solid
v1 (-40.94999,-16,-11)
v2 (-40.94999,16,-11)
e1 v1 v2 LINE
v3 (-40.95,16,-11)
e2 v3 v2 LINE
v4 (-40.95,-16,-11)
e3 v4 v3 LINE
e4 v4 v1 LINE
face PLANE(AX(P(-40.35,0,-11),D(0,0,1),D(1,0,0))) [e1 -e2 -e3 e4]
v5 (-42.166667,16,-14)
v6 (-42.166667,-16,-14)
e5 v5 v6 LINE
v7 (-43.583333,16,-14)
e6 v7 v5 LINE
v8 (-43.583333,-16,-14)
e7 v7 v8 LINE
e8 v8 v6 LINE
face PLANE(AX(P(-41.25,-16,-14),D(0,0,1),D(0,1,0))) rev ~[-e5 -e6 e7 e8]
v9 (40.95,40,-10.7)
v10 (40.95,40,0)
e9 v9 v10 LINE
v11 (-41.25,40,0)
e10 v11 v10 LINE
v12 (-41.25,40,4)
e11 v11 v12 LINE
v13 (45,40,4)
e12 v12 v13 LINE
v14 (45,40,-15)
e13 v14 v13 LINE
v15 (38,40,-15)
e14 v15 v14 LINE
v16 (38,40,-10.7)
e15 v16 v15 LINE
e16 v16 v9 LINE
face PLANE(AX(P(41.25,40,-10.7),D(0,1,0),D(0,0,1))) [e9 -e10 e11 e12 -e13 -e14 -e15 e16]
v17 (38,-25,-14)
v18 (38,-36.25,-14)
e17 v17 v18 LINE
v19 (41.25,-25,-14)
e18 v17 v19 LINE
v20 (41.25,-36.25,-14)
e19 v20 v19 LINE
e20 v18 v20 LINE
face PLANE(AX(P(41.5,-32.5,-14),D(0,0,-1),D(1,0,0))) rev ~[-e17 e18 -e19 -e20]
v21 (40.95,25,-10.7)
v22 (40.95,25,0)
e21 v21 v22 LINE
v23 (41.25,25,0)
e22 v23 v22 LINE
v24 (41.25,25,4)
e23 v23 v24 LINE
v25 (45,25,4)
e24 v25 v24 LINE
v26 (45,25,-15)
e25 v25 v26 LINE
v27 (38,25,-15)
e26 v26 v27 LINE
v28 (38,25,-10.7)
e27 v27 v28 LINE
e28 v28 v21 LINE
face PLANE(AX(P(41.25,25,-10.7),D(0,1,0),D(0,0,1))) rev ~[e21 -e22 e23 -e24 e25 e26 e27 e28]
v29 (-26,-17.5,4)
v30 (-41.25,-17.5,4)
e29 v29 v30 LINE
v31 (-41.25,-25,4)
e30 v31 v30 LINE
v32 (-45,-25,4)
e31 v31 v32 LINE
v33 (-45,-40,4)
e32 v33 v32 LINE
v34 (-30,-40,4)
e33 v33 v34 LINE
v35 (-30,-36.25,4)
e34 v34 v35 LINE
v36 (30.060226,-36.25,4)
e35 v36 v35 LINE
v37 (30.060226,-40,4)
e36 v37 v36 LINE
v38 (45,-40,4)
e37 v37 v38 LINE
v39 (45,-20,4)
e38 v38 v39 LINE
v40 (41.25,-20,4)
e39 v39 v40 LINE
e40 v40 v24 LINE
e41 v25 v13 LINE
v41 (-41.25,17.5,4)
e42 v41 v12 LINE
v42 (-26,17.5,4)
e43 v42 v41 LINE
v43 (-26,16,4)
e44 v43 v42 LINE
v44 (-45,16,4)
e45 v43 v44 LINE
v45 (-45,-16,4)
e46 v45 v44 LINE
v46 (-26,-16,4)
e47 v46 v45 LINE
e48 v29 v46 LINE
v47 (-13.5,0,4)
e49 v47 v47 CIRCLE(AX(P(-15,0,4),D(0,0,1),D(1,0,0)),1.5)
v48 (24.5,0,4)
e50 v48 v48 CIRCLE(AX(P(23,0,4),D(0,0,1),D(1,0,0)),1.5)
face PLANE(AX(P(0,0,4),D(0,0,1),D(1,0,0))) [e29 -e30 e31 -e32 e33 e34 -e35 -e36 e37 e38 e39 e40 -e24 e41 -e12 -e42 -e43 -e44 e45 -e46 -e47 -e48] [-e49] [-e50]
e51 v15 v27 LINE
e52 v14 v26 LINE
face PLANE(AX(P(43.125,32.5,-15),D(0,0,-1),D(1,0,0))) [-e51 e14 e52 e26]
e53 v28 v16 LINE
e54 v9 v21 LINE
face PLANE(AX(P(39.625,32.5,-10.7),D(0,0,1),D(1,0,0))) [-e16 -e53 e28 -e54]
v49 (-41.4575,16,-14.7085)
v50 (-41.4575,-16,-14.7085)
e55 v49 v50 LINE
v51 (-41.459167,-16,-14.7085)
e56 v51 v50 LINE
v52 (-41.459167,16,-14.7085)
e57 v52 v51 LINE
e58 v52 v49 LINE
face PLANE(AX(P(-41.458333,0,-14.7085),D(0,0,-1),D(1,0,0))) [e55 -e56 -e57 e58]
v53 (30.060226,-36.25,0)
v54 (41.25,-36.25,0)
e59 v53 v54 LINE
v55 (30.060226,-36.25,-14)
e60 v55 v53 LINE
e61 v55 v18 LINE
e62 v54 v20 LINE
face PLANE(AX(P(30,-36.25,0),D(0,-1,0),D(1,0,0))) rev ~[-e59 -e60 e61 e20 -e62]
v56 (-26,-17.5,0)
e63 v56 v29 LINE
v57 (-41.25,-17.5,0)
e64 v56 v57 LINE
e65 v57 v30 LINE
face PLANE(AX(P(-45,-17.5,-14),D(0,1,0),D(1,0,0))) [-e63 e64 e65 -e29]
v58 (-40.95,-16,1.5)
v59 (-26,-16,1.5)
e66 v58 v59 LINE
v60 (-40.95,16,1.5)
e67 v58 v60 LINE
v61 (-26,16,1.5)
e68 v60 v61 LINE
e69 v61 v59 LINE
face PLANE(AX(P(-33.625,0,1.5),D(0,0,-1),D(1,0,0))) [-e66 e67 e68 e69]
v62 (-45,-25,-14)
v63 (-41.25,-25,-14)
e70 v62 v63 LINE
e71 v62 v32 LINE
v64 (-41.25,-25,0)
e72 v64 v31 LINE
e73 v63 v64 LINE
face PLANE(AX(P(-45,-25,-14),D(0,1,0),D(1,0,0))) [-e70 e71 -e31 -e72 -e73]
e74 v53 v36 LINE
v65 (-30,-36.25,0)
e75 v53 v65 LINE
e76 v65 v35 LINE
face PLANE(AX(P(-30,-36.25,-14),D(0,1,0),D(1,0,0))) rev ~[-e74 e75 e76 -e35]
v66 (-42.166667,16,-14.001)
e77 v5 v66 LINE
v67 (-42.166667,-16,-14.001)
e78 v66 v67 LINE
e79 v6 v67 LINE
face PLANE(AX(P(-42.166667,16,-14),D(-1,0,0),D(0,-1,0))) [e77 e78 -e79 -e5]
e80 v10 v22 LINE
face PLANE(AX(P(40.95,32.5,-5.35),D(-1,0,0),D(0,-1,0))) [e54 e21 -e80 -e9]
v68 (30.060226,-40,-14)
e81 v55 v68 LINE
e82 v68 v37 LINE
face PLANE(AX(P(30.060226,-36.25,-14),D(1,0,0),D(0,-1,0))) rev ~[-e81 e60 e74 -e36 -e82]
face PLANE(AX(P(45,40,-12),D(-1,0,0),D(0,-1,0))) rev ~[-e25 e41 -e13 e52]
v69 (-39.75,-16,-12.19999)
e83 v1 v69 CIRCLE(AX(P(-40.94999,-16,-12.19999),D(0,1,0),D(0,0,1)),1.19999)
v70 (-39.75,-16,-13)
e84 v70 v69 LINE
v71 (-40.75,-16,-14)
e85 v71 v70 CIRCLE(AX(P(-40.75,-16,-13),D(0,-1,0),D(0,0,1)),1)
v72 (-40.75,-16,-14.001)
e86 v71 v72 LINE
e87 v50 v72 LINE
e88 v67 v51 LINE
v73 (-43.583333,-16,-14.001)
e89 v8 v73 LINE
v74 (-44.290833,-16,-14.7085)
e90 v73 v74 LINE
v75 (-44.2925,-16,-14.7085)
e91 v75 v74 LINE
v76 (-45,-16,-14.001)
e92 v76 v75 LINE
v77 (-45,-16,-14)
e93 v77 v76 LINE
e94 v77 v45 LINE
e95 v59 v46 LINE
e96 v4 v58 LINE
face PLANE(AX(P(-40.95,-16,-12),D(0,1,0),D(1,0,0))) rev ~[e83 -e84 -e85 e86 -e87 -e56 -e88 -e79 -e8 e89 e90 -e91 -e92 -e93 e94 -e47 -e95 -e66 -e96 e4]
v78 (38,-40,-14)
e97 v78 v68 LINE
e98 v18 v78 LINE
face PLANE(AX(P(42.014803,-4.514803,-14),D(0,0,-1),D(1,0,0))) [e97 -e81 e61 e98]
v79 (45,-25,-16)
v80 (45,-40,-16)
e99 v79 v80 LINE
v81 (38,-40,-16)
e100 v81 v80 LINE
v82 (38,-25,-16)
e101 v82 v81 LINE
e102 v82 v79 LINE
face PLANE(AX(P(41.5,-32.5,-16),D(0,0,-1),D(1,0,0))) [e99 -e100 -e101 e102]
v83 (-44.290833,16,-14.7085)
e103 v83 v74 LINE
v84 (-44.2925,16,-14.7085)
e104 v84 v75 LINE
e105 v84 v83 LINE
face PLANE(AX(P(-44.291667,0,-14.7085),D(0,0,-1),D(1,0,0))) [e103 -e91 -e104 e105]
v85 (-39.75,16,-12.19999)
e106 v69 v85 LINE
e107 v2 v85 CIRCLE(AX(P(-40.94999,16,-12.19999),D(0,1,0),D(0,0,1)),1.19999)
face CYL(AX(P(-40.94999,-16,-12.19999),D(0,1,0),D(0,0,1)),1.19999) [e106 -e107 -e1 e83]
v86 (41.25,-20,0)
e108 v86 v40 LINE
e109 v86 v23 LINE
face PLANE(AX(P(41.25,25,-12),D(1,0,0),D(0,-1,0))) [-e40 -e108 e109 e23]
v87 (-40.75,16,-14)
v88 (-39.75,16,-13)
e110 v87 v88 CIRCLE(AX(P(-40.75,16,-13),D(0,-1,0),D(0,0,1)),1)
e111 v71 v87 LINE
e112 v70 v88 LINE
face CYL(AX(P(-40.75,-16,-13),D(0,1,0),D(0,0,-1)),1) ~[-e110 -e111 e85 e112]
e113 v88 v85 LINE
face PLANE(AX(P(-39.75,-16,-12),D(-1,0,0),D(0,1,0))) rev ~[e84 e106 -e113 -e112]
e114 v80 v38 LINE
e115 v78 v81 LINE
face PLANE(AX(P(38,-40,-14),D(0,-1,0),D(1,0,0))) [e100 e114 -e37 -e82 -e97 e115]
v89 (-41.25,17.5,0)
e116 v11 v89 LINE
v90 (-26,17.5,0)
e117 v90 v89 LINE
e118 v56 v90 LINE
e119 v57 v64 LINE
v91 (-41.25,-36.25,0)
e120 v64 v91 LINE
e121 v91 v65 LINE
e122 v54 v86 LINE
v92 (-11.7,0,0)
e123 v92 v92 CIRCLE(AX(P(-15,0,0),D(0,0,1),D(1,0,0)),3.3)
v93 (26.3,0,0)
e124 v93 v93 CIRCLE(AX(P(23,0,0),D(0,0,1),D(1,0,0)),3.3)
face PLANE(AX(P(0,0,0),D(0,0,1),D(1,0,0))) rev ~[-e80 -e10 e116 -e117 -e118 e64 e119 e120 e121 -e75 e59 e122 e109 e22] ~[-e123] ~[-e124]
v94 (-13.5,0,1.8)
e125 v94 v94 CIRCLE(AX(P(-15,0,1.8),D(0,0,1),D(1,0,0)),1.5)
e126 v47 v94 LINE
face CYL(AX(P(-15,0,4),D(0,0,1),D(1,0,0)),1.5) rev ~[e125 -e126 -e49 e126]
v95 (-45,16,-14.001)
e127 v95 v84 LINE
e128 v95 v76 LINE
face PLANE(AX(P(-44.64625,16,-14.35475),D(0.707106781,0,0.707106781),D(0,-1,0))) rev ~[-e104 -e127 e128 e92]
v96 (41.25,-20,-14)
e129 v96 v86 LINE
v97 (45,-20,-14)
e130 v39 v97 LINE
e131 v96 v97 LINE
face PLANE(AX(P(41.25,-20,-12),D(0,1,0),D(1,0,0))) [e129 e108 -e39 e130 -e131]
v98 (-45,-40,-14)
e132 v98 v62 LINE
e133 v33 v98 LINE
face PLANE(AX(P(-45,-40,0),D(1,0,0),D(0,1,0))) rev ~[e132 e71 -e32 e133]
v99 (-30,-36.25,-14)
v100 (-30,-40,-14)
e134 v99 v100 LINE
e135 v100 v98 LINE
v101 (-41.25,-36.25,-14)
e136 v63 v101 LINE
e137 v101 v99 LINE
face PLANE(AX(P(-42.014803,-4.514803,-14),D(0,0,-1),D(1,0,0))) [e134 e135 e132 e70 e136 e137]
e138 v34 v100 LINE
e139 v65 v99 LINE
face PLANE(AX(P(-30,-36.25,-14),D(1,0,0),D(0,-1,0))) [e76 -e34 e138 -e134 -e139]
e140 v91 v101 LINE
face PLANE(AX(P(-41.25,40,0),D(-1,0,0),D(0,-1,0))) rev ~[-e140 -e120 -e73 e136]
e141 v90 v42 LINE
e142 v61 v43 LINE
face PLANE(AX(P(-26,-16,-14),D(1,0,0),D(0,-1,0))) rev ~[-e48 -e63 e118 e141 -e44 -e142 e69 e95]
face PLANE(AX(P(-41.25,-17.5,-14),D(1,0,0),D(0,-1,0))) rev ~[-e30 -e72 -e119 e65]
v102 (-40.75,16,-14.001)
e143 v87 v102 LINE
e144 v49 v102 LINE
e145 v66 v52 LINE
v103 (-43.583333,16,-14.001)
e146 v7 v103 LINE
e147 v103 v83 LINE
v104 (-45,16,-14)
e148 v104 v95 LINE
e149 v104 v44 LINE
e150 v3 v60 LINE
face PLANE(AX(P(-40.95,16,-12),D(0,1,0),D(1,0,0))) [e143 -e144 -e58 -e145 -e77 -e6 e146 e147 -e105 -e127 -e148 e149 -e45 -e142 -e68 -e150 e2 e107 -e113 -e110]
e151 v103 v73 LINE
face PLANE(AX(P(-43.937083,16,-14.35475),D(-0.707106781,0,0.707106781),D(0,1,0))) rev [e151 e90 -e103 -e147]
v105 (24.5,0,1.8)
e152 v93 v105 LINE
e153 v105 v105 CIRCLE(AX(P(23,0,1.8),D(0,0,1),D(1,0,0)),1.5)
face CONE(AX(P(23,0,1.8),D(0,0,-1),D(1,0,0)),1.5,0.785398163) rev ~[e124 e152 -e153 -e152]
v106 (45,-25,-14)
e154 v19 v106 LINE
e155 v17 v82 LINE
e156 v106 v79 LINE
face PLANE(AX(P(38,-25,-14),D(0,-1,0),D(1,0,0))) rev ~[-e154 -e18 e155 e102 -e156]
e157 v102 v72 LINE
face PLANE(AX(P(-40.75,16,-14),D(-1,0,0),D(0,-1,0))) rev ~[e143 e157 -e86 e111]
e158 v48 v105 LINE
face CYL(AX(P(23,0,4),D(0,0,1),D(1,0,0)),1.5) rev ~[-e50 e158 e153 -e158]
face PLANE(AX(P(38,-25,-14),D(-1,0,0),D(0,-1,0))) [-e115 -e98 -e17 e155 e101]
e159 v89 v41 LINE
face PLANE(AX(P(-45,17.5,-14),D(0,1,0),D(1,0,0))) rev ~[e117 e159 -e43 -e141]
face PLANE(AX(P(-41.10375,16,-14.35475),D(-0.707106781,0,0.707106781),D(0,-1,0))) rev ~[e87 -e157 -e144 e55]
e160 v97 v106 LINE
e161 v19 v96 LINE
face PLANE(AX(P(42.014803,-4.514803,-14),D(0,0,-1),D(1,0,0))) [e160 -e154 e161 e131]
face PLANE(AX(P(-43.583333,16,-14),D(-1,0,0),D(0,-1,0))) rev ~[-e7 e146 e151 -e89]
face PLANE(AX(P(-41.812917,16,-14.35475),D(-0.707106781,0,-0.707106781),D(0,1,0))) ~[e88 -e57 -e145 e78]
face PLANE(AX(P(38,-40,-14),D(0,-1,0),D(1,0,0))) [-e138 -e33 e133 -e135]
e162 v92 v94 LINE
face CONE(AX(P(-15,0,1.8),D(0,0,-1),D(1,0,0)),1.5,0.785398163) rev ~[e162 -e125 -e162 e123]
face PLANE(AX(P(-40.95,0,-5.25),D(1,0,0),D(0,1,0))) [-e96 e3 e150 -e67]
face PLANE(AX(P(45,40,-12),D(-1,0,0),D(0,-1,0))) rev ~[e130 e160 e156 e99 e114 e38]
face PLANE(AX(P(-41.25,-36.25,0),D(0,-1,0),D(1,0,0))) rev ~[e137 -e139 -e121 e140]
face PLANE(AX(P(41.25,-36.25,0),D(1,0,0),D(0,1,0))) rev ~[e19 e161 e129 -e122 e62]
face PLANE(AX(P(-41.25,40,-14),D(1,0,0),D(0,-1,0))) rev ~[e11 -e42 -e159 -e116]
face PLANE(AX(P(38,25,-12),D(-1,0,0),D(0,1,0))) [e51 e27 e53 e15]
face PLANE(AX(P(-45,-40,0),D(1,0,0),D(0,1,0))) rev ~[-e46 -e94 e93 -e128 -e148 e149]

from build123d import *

# Parameters (mm, degrees)
F0_W      = 90
F0_H      = 80
F1_DEPTH  = 4
F2_R      = 1.5
F3_DEPTH  = 4.001
F5_DEPTH  = 14
F6_W      = 7
F6_H      = 15
F7_DEPTH  = 2
F8_W      = 3.75
F8_H      = 60
F9_DEPTH  = 2
F10_W     = 3.75
F10_H     = 15
F10_W_2   = 3.25
F11_DEPTH = 3
F12_W     = 3.75
F12_H     = 45
F13_DEPTH = 16.001
F14_W     = 19
F14_H     = 1.5
F15_DEPTH = 25
F16_W     = 3.75
F16_H     = 22.5
F17_DEPTH = 25
F18_W     = 32
F18_H     = 2
F19_DEPTH = 1.5
F20_R     = 1
F21_W     = 1.4166666667
F21_H     = 32
F22_DEPTH = 0.7085
F23_SIZE  = 0.7075
F24_SIZE  = 1.8
F25_W     = 3.75
F25_H     = 7.5
F25_W_2   = 60.0602255464
F25_H_2   = 3.75
F26_DEPTH = 25
F27_W     = 15.25
F27_H     = 32
F28_DEPTH = 1.5
F29_W     = 32
F29_H     = 13.5
F30_DEPTH = 0.3
F31_W     = 3.25
F31_H     = 15
F32_DEPTH = 1.3
F33_W     = 15
F33_H     = 10.7
F34_DEPTH = 0.3
F35_W     = 1.2
F35_H     = 32
F36_DEPTH = 1
F37_R     = 1.19999


# Not quite as in the source:
# - a fillet or chamfer is up to 0.001 mm smaller than in the source, because OpenCascade refuses the exact size
# - a feature names something its author has since deleted; it is built from what else it names


with BuildPart() as f1:
    # F0 (on Top) → F1 (new body)
    with BuildSketch(Plane.XY):
        Rectangle(F0_W, F0_H)
    extrude(amount=F1_DEPTH)

    # F2 (on face) → F3 (cut, through all)
    with BuildSketch(Plane.XY.offset(4)):
        with Locations((23, 0)):
            Circle(F2_R)
        with Locations((-15, 0)):
            Circle(F2_R)
    extrude(amount=-F3_DEPTH, mode=Mode.SUBTRACT)

    # F4 (on face) → F5 (join)
    with BuildSketch(Plane(origin=(0, 0, 0), x_dir=(1, 0, 0), z_dir=(0, 0, -1))):
        Polygon((-41.25, -36.25), (-41.25, 36.25), (-30, 36.25), (-30, 40), (-45, 40), (-45, -40), (-41.25, -40), align=None)
        Polygon((45, 40), (30, 40), (30, 36.25), (41.25, 36.25), (41.25, -36.25), (41.25, -40), (45, -40), align=None)
    extrude(amount=F5_DEPTH)

    # F6 (on face) → F7 (join)
    with BuildSketch(Plane(origin=(0, 0, -14), x_dir=(1, 0, 0), z_dir=(0, 0, -1))):
        with Locations((41.5, 32.5)):
            Rectangle(F6_W, F6_H)
    extrude(amount=F7_DEPTH)

    # F8 (on face) → F9 (cut)
    with BuildSketch(Plane(origin=(0, 0, -14), x_dir=(1, 0, 0), z_dir=(0, 0, -1))):
        with Locations((43.125, -10)):
            Rectangle(F8_W, F8_H)
    extrude(amount=-F9_DEPTH, mode=Mode.SUBTRACT)

    # F10 (on face) → F11 (join)
    with BuildSketch(Plane(origin=(0, 0, -12), x_dir=(1, 0, 0), z_dir=(0, 0, -1))):
        with Locations((43.125, -32.5)):
            Rectangle(F10_W, F10_H)
        with Locations((39.625, -32.5)):
            Rectangle(F10_W_2, F10_H)
    extrude(amount=F11_DEPTH)

    # F12 (on face) → F13 (cut, through all)
    with BuildSketch(Plane(origin=(0, 0, -12), x_dir=(1, 0, 0), z_dir=(0, 0, -1))):
        with Locations((43.125, -2.5)):
            Rectangle(F12_W, F12_H)
    extrude(amount=-F13_DEPTH, mode=Mode.SUBTRACT)

    # F14 (on face) → F15 (cut)
    with BuildSketch(Plane(origin=(0, 0, -14), x_dir=(1, 0, 0), z_dir=(0, 0, -1))):
        with Locations((-35.5, 16.75)):
            Rectangle(F14_W, F14_H)
        with Locations((-35.5, -16.75)):
            Rectangle(F14_W, F14_H)
    extrude(amount=-F15_DEPTH, mode=Mode.SUBTRACT)

    # F16 (on face) → F17 (cut)
    with BuildSketch(Plane(origin=(0, 0, -14), x_dir=(1, 0, 0), z_dir=(0, 0, -1))):
        with Locations((-43.125, -28.75)):
            Rectangle(F16_W, F16_H)
    extrude(amount=-F17_DEPTH, mode=Mode.SUBTRACT)

    # F18 (on face) → F19 (join)
    with BuildSketch(Plane.YZ.offset(-41.25)):
        with Locations((0, -13)):
            Rectangle(F18_W, F18_H)
    extrude(amount=F19_DEPTH)

    # F20
    f20_edges = [f1.edges().sort_by_distance(p)[0] for p in [
        (-39.75, 0, -14),
    ]]
    fillet(f20_edges, radius=F20_R)

    # F21 (on face) → F22 (join)
    with BuildSketch(Plane(origin=(0, 0, -14), x_dir=(1, 0, 0), z_dir=(0, 0, -1))):
        with Locations((-41.4583333333, 0)):
            Rectangle(F21_W, F21_H)
        with Locations((-44.2916666667, 0)):
            Rectangle(F21_W, F21_H)
    extrude(amount=F22_DEPTH)

    # F23 (size 0.7085 in the source; OpenCascade refuses exactly that, so slightly less here)
    f23_edges = [f1.edges().sort_by_distance(p)[0] for p in [
        (-40.75, 0, -14.7085),
        (-42.166667, 0, -14.7085),
        (-43.583333, 0, -14.7085),
        (-45, 0, -14.7085),
    ]]
    chamfer(f23_edges, length=F23_SIZE)

    # F24
    f24_edges = [f1.edges().sort_by_distance(p)[0] for p in [
        (-16.5, 0, 0),
        (21.5, 0, 0),
    ]]
    chamfer(f24_edges, length=F24_SIZE)

    # F25 (on face) → F26 (cut)
    with BuildSketch(Plane(origin=(0, 0, -14), x_dir=(1, 0, 0), z_dir=(0, 0, -1))):
        with Locations((-43.125, 21.25)):
            Rectangle(F25_W, F25_H)
        with Locations((0.0301127732, 38.125)):
            Rectangle(F25_W_2, F25_H_2)
    extrude(amount=-F26_DEPTH, mode=Mode.SUBTRACT)

    # F27 (on face) → F28 (cut)
    with BuildSketch(Plane(origin=(0, 0, 0), x_dir=(1, 0, 0), z_dir=(0, 0, -1))):
        with Locations((-33.625, 0)):
            Rectangle(F27_W, F27_H)
    extrude(amount=-F28_DEPTH, mode=Mode.SUBTRACT)

    # F29 (on face) → F30 (join)
    with BuildSketch(Plane.YZ.offset(-41.25)):
        with Locations((0, -5.25)):
            Rectangle(F29_W, F29_H)
    extrude(amount=F30_DEPTH)

    # F31 (on face) → F32 (join)
    with BuildSketch(Plane.XY.offset(-12)):
        with Locations((39.625, 32.5)):
            Rectangle(F31_W, F31_H)
    extrude(amount=F32_DEPTH)

    # F33 (on face) → F34 (join)
    with BuildSketch(Plane(origin=(41.25, 0, 0), x_dir=(0, -1, 0), z_dir=(-1, 0, 0))):
        with Locations((-32.5, -5.35)):
            Rectangle(F33_W, F33_H)
    extrude(amount=F34_DEPTH)

    # F35 (on face) → F36 (join)
    with BuildSketch(Plane.XY.offset(-12)):
        with Locations((-40.35, 0)):
            Rectangle(F35_W, F35_H)
    extrude(amount=F36_DEPTH)

    # F37 (radius 1.2 in the source; OpenCascade refuses exactly that, so slightly less here)
    f37_edges = [f1.edges().sort_by_distance(p)[0] for p in [
        (-39.75, 0, -11),
    ]]
    fillet(f37_edges, radius=F37_R)


solid = f1.part
